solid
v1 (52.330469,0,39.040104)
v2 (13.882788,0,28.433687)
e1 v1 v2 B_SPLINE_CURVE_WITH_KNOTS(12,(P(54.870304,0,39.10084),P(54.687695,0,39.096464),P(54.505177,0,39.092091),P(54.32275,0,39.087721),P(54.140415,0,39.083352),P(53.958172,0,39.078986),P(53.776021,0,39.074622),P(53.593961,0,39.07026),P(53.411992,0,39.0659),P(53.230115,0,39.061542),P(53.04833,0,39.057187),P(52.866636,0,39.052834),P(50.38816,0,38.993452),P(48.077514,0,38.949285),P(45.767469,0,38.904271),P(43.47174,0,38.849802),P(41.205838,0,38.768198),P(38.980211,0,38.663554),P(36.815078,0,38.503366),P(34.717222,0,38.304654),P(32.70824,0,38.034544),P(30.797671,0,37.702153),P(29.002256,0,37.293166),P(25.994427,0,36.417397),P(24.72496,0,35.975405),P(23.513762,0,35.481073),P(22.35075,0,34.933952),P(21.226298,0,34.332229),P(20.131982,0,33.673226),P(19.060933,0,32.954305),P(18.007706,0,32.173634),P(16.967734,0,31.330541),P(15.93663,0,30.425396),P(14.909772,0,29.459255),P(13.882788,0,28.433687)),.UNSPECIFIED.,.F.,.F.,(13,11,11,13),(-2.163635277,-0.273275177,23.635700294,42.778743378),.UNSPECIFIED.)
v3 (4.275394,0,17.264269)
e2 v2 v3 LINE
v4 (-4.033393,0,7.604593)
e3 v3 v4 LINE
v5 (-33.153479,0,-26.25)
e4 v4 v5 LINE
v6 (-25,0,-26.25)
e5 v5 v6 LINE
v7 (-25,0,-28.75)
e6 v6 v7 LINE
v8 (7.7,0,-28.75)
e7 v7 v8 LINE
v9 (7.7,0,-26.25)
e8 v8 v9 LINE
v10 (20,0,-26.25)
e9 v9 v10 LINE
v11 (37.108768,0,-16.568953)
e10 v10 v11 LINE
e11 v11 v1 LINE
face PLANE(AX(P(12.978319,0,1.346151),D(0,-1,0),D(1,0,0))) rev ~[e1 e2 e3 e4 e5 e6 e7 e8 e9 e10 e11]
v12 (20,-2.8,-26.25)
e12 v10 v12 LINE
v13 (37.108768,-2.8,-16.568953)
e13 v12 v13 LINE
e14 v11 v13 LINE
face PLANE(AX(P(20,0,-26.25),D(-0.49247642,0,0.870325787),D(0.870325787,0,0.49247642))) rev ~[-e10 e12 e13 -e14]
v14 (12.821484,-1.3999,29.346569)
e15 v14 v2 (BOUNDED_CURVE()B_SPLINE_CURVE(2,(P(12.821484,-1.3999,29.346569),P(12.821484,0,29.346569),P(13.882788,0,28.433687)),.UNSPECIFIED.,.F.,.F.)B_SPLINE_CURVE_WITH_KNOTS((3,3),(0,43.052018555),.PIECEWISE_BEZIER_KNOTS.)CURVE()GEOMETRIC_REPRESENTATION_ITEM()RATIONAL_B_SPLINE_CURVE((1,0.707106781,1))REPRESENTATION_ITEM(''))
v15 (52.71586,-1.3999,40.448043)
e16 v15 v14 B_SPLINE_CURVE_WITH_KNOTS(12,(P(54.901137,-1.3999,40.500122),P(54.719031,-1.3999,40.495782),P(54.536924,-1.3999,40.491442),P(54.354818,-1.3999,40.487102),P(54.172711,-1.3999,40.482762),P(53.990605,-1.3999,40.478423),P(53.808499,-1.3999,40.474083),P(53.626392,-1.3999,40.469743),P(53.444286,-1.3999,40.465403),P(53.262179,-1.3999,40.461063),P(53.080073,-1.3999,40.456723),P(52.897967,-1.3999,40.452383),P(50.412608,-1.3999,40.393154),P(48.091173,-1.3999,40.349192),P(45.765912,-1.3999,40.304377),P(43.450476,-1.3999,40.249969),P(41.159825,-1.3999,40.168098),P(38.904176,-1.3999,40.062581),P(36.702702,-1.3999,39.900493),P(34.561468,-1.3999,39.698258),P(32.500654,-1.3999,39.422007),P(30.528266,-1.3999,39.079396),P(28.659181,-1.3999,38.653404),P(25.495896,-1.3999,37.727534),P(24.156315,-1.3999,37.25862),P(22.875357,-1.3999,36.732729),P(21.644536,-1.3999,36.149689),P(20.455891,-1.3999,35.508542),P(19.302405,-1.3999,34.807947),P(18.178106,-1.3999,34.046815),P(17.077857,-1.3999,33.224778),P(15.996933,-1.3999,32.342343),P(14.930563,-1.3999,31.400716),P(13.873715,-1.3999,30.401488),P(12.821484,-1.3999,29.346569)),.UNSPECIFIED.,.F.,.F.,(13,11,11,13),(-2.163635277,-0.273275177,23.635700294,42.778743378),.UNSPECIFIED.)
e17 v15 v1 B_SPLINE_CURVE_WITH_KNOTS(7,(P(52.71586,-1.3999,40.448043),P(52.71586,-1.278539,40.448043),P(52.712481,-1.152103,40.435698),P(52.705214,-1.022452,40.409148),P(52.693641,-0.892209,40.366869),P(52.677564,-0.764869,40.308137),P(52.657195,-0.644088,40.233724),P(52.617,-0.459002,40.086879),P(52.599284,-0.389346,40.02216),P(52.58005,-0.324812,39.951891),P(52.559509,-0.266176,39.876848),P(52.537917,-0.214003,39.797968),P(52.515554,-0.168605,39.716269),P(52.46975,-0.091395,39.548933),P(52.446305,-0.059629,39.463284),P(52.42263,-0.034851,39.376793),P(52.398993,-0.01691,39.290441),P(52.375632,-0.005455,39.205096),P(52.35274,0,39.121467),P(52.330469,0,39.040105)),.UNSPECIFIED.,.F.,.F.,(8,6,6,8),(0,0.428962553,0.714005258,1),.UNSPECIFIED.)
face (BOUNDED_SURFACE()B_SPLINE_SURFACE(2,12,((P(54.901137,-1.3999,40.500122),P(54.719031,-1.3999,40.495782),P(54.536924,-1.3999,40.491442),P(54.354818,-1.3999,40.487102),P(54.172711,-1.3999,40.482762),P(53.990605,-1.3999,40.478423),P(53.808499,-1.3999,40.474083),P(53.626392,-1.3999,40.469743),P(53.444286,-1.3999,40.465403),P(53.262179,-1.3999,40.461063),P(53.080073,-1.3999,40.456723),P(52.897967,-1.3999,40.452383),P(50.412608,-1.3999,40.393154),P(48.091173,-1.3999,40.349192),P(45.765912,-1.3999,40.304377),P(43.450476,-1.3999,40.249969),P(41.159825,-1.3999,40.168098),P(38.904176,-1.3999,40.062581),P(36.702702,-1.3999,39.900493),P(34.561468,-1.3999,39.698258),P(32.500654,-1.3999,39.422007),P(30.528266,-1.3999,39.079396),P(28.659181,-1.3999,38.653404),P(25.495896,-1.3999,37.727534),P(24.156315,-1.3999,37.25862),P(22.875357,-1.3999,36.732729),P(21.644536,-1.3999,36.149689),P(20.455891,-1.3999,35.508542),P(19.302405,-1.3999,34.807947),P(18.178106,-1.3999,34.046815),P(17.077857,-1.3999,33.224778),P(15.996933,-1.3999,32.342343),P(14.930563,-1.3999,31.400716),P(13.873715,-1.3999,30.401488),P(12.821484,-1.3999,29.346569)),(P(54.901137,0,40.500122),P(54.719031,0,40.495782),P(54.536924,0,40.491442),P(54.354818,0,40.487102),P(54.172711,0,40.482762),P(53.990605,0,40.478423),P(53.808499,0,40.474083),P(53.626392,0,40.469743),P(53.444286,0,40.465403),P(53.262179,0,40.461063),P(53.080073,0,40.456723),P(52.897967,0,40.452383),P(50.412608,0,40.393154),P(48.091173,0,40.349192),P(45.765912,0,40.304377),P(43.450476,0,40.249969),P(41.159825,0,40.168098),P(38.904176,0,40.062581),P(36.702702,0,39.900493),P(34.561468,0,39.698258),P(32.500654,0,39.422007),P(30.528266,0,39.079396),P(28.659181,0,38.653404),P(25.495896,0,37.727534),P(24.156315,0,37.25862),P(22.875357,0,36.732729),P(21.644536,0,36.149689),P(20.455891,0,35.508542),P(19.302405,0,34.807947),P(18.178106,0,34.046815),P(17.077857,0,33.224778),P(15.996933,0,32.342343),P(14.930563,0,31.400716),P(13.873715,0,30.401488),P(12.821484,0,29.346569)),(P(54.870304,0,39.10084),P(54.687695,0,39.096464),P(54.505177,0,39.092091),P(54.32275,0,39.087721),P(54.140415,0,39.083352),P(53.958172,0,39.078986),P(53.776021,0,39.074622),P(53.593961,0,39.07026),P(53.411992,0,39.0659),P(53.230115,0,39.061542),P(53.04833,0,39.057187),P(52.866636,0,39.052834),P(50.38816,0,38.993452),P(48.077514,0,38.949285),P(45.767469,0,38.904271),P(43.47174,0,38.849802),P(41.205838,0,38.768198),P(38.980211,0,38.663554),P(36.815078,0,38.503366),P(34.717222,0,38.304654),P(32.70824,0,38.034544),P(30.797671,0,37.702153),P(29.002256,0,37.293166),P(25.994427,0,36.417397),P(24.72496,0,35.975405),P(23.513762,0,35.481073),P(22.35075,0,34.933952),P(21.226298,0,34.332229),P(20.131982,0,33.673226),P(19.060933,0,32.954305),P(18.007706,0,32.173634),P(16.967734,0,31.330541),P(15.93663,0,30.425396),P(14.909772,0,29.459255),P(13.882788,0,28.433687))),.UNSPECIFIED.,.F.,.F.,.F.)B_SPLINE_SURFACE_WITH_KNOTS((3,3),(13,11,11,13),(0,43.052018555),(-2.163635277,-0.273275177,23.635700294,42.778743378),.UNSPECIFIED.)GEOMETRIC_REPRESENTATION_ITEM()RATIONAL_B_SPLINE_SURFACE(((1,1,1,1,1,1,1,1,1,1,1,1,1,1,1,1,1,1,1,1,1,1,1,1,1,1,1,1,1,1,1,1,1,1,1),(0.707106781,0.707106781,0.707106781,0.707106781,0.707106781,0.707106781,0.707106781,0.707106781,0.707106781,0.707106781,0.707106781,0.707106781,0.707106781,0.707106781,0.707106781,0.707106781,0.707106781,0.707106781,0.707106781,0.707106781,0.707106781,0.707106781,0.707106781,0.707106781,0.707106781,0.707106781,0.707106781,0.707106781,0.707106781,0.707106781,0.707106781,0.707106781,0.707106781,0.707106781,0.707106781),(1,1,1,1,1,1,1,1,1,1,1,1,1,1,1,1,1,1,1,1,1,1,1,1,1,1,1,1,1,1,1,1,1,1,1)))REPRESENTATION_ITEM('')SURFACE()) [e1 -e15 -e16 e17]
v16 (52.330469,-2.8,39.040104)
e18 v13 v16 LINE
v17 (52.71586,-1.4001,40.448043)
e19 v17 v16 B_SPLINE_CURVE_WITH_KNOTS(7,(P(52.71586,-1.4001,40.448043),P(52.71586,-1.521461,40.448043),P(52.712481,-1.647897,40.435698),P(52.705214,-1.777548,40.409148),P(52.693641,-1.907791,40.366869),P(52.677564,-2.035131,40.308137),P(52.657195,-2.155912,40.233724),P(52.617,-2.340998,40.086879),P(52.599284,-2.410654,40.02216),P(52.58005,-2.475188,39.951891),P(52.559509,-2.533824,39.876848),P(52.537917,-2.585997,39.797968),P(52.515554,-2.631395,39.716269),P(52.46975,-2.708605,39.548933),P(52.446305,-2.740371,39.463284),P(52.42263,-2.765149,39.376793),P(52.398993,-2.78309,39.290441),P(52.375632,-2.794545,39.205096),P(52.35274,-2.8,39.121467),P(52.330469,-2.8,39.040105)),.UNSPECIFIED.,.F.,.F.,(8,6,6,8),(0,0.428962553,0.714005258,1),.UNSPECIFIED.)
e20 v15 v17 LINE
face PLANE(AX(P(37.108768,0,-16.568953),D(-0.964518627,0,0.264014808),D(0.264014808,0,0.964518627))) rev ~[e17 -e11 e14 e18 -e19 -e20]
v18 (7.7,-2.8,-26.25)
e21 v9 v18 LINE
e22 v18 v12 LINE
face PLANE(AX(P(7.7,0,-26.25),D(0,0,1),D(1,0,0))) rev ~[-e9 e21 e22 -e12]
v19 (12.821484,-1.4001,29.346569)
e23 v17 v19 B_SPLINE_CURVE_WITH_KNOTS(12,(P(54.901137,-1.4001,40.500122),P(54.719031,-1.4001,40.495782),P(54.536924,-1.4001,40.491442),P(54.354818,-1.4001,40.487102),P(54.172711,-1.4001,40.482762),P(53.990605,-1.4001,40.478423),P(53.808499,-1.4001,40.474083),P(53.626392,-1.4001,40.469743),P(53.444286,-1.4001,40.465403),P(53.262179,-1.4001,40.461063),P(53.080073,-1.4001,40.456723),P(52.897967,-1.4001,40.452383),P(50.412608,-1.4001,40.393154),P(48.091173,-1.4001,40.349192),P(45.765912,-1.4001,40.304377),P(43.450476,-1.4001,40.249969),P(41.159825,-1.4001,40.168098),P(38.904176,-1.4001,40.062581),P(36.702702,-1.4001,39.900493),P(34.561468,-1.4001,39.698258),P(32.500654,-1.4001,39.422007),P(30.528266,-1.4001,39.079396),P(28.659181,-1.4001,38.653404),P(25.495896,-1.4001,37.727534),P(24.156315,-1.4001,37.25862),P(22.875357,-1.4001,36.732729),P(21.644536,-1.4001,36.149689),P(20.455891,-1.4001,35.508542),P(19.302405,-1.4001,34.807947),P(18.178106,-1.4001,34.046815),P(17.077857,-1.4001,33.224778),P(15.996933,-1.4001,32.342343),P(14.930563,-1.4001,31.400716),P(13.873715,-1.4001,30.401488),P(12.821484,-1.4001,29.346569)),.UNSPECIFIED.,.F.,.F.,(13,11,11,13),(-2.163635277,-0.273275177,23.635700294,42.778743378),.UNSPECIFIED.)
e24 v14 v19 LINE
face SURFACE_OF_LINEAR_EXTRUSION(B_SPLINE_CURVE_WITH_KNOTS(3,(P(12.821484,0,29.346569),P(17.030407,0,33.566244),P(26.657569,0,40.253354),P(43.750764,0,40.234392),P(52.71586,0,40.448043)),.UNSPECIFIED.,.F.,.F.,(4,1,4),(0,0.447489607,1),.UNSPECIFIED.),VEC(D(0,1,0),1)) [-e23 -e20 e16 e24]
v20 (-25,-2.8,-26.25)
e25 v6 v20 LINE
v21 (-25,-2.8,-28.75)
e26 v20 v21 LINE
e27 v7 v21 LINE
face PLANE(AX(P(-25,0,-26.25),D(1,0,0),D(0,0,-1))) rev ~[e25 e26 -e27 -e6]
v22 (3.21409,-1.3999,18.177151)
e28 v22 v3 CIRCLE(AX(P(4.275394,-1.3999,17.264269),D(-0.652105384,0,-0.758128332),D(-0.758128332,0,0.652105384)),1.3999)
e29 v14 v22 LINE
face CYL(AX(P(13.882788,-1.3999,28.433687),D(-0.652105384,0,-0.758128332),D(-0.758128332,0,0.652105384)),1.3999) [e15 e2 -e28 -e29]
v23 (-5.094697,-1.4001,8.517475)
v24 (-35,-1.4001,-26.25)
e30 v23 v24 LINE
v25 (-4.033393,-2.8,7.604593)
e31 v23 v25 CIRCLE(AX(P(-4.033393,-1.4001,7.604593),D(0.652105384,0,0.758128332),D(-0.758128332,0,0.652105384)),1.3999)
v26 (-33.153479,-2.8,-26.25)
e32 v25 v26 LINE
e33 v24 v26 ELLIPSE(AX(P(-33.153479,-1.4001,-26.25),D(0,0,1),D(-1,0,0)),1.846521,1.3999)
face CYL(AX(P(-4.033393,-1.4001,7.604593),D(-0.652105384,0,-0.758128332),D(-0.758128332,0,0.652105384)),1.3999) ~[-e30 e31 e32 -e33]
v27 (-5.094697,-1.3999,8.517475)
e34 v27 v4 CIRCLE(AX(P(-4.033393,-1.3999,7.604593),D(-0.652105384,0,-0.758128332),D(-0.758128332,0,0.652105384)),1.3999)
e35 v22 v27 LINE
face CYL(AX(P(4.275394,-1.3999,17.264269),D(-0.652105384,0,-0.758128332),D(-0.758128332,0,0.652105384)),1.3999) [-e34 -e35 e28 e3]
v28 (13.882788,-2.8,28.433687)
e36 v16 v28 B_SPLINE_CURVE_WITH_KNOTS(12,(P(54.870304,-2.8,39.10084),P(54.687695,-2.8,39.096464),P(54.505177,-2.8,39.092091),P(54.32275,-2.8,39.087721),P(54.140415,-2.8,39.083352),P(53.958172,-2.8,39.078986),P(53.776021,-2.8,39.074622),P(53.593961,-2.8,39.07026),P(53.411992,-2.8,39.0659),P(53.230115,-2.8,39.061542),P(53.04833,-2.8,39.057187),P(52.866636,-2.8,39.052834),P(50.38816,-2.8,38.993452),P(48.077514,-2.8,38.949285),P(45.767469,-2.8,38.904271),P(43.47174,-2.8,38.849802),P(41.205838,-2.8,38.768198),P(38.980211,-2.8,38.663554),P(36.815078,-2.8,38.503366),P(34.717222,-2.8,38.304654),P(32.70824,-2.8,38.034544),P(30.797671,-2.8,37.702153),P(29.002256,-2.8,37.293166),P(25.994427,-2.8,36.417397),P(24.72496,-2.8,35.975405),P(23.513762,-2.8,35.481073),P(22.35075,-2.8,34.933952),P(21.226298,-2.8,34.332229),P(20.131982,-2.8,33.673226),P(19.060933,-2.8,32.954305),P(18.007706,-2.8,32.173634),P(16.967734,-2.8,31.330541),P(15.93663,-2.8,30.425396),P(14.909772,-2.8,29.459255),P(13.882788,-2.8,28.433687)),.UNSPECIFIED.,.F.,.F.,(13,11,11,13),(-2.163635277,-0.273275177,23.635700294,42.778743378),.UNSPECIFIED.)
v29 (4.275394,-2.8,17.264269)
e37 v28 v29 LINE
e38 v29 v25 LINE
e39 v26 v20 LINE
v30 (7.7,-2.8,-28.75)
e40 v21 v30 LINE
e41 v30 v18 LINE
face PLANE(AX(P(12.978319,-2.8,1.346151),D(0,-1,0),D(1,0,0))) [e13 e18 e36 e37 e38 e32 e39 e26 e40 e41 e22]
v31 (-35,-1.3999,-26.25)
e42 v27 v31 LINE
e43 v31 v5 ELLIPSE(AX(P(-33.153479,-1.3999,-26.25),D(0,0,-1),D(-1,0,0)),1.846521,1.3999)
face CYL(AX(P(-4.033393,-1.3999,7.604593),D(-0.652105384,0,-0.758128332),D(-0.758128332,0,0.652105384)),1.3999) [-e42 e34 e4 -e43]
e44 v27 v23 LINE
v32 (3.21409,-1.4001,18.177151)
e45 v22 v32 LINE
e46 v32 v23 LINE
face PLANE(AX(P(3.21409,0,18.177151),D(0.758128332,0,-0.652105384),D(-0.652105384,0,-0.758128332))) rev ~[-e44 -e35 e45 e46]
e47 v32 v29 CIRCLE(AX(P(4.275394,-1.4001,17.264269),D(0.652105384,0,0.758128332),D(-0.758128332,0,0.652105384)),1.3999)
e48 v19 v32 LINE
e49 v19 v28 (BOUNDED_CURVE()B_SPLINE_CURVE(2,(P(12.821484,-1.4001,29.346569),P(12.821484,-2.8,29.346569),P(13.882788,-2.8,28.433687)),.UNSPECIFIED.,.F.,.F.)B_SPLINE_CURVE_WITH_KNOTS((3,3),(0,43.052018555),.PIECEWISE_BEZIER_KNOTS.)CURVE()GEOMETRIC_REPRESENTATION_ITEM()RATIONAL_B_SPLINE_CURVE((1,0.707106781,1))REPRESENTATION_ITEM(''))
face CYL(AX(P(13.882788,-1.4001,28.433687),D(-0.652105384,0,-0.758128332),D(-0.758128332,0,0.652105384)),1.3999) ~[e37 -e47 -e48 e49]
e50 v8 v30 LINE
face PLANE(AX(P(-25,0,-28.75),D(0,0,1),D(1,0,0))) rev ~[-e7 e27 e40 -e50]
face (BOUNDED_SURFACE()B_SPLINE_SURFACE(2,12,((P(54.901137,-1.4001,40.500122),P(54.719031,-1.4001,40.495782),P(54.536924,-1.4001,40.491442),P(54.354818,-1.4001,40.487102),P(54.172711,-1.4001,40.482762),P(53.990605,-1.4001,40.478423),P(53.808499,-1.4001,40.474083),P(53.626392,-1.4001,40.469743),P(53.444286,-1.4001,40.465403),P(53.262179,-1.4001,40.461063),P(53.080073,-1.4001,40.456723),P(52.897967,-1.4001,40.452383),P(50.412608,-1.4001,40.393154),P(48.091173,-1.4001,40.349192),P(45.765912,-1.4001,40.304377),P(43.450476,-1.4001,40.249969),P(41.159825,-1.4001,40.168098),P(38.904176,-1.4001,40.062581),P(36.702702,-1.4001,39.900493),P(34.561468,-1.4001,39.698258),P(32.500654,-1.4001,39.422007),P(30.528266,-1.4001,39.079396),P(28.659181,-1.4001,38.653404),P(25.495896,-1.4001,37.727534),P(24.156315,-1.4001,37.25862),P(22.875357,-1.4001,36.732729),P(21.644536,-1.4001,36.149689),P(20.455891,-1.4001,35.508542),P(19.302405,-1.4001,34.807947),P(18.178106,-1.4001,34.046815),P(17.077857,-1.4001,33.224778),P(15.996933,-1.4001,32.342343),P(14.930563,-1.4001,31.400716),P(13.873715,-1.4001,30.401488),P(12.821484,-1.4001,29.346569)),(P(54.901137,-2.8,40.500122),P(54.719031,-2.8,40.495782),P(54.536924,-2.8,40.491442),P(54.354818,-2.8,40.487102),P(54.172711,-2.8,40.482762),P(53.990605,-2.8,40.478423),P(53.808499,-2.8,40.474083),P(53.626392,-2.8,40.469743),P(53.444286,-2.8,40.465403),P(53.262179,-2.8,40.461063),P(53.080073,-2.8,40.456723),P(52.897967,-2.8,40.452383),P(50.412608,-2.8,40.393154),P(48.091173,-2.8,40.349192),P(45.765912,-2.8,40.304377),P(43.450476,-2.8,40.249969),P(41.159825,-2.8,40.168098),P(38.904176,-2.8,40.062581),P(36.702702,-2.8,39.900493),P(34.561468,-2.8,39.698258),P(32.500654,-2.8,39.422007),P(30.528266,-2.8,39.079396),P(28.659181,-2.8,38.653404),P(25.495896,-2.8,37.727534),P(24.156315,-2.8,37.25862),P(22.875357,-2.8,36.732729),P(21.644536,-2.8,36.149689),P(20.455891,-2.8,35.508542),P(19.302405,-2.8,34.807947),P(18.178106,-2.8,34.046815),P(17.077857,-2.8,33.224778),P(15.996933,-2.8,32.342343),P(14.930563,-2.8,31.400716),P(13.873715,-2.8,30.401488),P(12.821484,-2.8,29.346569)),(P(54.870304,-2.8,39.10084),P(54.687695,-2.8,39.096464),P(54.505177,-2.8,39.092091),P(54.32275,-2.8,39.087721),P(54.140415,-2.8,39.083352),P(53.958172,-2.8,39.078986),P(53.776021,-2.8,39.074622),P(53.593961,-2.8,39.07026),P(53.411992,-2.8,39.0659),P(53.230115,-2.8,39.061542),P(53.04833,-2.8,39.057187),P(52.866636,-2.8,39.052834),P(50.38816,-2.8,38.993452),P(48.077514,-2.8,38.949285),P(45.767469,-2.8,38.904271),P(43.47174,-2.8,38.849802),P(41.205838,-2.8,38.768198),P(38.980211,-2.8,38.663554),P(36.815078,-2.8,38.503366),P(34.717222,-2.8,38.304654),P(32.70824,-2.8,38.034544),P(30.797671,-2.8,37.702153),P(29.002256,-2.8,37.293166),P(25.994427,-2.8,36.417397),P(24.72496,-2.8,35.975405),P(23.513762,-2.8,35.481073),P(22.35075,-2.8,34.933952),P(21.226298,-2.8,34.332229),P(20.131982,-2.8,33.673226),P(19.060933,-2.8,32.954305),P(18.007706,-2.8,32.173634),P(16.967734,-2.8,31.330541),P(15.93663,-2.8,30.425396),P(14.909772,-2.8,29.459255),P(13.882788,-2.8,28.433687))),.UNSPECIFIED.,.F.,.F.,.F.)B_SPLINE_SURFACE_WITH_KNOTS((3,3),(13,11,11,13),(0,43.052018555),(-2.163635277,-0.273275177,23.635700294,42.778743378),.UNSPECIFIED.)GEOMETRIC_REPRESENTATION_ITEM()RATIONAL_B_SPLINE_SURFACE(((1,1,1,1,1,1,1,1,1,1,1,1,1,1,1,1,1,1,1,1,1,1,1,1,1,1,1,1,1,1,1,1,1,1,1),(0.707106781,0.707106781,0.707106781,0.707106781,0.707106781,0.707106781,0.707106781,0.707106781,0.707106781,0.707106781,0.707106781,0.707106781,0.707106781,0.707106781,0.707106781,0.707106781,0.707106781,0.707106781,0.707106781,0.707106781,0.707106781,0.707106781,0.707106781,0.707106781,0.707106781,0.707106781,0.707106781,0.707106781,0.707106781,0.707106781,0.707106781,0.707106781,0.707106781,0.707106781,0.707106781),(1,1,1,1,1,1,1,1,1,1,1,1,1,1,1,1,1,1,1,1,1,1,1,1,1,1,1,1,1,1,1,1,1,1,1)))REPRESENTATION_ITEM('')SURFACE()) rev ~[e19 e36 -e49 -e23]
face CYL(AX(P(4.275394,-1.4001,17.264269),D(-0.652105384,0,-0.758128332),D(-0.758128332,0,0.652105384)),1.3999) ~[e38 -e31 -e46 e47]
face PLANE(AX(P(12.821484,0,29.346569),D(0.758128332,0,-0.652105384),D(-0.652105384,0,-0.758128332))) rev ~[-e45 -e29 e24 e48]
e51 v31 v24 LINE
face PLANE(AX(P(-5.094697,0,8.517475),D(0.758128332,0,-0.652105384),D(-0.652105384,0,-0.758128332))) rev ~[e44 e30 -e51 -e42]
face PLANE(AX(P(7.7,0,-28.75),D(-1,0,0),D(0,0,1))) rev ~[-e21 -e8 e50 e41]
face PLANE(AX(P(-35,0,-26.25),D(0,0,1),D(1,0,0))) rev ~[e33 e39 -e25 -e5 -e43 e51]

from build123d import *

# Parameters (mm, degrees)
F1_DEPTH = 2.8
F2_R     = 1.3999


# Not quite as in the source:
# - a fillet or chamfer is up to 0.001 mm smaller than in the source, because OpenCascade refuses the exact size
# - a feature names something its author has since deleted; it is built from what else it names


with BuildPart() as f1:
    # F0 (on Front) → F1 (new body)
    with BuildSketch(Plane.XZ):
        with BuildLine():
            Line((-25, -28.75), (7.7, -28.75))
            Line((7.7, -28.75), (7.7, -26.25))
            Line((7.7, -26.25), (20, -26.25))
            Line((20, -26.25), (37.1087677777, -16.5689531714))
            Line((37.1087677777, -16.5689531714), (52.7158603072, 40.4480434954))
            add(Edge.make_bspline(
                [(12.8214843672, 29.3465693193), (17.0304067433, 33.5662439466), (26.6575691876, 40.2533537434), (43.750764433, 40.2343917171), (52.7158603072, 40.4480434954)],
                knots=[0, 0, 0, 0, 0.4474896075, 1, 1, 1, 1], degree=3))
            Line((12.8214843672, 29.3465693193), (3.2140899724, 18.1771508975))
            Line((3.2140899724, 18.1771508975), (-5.0946967868, 8.517475019))
            Line((-5.0946967868, 8.517475019), (-35, -26.25))
            Line((-35, -26.25), (-25, -26.25))
            Line((-25, -26.25), (-25, -28.75))
        make_face()
    extrude(amount=F1_DEPTH)

    # F2 (radius 1.4 in the source; OpenCascade refuses exactly that, so slightly less here)
    f2_edges = [f1.edges().sort_by_distance(p)[0] for p in [
        (-11.089258, -2.8, 1.548285),
        (-11.089258, 0, 1.548285),
        (31.385103, -2.8, 39.151355),
        (31.385103, 0, 39.151355),
    ]]
    fillet(f2_edges, radius=F2_R)


solid = f1.part
